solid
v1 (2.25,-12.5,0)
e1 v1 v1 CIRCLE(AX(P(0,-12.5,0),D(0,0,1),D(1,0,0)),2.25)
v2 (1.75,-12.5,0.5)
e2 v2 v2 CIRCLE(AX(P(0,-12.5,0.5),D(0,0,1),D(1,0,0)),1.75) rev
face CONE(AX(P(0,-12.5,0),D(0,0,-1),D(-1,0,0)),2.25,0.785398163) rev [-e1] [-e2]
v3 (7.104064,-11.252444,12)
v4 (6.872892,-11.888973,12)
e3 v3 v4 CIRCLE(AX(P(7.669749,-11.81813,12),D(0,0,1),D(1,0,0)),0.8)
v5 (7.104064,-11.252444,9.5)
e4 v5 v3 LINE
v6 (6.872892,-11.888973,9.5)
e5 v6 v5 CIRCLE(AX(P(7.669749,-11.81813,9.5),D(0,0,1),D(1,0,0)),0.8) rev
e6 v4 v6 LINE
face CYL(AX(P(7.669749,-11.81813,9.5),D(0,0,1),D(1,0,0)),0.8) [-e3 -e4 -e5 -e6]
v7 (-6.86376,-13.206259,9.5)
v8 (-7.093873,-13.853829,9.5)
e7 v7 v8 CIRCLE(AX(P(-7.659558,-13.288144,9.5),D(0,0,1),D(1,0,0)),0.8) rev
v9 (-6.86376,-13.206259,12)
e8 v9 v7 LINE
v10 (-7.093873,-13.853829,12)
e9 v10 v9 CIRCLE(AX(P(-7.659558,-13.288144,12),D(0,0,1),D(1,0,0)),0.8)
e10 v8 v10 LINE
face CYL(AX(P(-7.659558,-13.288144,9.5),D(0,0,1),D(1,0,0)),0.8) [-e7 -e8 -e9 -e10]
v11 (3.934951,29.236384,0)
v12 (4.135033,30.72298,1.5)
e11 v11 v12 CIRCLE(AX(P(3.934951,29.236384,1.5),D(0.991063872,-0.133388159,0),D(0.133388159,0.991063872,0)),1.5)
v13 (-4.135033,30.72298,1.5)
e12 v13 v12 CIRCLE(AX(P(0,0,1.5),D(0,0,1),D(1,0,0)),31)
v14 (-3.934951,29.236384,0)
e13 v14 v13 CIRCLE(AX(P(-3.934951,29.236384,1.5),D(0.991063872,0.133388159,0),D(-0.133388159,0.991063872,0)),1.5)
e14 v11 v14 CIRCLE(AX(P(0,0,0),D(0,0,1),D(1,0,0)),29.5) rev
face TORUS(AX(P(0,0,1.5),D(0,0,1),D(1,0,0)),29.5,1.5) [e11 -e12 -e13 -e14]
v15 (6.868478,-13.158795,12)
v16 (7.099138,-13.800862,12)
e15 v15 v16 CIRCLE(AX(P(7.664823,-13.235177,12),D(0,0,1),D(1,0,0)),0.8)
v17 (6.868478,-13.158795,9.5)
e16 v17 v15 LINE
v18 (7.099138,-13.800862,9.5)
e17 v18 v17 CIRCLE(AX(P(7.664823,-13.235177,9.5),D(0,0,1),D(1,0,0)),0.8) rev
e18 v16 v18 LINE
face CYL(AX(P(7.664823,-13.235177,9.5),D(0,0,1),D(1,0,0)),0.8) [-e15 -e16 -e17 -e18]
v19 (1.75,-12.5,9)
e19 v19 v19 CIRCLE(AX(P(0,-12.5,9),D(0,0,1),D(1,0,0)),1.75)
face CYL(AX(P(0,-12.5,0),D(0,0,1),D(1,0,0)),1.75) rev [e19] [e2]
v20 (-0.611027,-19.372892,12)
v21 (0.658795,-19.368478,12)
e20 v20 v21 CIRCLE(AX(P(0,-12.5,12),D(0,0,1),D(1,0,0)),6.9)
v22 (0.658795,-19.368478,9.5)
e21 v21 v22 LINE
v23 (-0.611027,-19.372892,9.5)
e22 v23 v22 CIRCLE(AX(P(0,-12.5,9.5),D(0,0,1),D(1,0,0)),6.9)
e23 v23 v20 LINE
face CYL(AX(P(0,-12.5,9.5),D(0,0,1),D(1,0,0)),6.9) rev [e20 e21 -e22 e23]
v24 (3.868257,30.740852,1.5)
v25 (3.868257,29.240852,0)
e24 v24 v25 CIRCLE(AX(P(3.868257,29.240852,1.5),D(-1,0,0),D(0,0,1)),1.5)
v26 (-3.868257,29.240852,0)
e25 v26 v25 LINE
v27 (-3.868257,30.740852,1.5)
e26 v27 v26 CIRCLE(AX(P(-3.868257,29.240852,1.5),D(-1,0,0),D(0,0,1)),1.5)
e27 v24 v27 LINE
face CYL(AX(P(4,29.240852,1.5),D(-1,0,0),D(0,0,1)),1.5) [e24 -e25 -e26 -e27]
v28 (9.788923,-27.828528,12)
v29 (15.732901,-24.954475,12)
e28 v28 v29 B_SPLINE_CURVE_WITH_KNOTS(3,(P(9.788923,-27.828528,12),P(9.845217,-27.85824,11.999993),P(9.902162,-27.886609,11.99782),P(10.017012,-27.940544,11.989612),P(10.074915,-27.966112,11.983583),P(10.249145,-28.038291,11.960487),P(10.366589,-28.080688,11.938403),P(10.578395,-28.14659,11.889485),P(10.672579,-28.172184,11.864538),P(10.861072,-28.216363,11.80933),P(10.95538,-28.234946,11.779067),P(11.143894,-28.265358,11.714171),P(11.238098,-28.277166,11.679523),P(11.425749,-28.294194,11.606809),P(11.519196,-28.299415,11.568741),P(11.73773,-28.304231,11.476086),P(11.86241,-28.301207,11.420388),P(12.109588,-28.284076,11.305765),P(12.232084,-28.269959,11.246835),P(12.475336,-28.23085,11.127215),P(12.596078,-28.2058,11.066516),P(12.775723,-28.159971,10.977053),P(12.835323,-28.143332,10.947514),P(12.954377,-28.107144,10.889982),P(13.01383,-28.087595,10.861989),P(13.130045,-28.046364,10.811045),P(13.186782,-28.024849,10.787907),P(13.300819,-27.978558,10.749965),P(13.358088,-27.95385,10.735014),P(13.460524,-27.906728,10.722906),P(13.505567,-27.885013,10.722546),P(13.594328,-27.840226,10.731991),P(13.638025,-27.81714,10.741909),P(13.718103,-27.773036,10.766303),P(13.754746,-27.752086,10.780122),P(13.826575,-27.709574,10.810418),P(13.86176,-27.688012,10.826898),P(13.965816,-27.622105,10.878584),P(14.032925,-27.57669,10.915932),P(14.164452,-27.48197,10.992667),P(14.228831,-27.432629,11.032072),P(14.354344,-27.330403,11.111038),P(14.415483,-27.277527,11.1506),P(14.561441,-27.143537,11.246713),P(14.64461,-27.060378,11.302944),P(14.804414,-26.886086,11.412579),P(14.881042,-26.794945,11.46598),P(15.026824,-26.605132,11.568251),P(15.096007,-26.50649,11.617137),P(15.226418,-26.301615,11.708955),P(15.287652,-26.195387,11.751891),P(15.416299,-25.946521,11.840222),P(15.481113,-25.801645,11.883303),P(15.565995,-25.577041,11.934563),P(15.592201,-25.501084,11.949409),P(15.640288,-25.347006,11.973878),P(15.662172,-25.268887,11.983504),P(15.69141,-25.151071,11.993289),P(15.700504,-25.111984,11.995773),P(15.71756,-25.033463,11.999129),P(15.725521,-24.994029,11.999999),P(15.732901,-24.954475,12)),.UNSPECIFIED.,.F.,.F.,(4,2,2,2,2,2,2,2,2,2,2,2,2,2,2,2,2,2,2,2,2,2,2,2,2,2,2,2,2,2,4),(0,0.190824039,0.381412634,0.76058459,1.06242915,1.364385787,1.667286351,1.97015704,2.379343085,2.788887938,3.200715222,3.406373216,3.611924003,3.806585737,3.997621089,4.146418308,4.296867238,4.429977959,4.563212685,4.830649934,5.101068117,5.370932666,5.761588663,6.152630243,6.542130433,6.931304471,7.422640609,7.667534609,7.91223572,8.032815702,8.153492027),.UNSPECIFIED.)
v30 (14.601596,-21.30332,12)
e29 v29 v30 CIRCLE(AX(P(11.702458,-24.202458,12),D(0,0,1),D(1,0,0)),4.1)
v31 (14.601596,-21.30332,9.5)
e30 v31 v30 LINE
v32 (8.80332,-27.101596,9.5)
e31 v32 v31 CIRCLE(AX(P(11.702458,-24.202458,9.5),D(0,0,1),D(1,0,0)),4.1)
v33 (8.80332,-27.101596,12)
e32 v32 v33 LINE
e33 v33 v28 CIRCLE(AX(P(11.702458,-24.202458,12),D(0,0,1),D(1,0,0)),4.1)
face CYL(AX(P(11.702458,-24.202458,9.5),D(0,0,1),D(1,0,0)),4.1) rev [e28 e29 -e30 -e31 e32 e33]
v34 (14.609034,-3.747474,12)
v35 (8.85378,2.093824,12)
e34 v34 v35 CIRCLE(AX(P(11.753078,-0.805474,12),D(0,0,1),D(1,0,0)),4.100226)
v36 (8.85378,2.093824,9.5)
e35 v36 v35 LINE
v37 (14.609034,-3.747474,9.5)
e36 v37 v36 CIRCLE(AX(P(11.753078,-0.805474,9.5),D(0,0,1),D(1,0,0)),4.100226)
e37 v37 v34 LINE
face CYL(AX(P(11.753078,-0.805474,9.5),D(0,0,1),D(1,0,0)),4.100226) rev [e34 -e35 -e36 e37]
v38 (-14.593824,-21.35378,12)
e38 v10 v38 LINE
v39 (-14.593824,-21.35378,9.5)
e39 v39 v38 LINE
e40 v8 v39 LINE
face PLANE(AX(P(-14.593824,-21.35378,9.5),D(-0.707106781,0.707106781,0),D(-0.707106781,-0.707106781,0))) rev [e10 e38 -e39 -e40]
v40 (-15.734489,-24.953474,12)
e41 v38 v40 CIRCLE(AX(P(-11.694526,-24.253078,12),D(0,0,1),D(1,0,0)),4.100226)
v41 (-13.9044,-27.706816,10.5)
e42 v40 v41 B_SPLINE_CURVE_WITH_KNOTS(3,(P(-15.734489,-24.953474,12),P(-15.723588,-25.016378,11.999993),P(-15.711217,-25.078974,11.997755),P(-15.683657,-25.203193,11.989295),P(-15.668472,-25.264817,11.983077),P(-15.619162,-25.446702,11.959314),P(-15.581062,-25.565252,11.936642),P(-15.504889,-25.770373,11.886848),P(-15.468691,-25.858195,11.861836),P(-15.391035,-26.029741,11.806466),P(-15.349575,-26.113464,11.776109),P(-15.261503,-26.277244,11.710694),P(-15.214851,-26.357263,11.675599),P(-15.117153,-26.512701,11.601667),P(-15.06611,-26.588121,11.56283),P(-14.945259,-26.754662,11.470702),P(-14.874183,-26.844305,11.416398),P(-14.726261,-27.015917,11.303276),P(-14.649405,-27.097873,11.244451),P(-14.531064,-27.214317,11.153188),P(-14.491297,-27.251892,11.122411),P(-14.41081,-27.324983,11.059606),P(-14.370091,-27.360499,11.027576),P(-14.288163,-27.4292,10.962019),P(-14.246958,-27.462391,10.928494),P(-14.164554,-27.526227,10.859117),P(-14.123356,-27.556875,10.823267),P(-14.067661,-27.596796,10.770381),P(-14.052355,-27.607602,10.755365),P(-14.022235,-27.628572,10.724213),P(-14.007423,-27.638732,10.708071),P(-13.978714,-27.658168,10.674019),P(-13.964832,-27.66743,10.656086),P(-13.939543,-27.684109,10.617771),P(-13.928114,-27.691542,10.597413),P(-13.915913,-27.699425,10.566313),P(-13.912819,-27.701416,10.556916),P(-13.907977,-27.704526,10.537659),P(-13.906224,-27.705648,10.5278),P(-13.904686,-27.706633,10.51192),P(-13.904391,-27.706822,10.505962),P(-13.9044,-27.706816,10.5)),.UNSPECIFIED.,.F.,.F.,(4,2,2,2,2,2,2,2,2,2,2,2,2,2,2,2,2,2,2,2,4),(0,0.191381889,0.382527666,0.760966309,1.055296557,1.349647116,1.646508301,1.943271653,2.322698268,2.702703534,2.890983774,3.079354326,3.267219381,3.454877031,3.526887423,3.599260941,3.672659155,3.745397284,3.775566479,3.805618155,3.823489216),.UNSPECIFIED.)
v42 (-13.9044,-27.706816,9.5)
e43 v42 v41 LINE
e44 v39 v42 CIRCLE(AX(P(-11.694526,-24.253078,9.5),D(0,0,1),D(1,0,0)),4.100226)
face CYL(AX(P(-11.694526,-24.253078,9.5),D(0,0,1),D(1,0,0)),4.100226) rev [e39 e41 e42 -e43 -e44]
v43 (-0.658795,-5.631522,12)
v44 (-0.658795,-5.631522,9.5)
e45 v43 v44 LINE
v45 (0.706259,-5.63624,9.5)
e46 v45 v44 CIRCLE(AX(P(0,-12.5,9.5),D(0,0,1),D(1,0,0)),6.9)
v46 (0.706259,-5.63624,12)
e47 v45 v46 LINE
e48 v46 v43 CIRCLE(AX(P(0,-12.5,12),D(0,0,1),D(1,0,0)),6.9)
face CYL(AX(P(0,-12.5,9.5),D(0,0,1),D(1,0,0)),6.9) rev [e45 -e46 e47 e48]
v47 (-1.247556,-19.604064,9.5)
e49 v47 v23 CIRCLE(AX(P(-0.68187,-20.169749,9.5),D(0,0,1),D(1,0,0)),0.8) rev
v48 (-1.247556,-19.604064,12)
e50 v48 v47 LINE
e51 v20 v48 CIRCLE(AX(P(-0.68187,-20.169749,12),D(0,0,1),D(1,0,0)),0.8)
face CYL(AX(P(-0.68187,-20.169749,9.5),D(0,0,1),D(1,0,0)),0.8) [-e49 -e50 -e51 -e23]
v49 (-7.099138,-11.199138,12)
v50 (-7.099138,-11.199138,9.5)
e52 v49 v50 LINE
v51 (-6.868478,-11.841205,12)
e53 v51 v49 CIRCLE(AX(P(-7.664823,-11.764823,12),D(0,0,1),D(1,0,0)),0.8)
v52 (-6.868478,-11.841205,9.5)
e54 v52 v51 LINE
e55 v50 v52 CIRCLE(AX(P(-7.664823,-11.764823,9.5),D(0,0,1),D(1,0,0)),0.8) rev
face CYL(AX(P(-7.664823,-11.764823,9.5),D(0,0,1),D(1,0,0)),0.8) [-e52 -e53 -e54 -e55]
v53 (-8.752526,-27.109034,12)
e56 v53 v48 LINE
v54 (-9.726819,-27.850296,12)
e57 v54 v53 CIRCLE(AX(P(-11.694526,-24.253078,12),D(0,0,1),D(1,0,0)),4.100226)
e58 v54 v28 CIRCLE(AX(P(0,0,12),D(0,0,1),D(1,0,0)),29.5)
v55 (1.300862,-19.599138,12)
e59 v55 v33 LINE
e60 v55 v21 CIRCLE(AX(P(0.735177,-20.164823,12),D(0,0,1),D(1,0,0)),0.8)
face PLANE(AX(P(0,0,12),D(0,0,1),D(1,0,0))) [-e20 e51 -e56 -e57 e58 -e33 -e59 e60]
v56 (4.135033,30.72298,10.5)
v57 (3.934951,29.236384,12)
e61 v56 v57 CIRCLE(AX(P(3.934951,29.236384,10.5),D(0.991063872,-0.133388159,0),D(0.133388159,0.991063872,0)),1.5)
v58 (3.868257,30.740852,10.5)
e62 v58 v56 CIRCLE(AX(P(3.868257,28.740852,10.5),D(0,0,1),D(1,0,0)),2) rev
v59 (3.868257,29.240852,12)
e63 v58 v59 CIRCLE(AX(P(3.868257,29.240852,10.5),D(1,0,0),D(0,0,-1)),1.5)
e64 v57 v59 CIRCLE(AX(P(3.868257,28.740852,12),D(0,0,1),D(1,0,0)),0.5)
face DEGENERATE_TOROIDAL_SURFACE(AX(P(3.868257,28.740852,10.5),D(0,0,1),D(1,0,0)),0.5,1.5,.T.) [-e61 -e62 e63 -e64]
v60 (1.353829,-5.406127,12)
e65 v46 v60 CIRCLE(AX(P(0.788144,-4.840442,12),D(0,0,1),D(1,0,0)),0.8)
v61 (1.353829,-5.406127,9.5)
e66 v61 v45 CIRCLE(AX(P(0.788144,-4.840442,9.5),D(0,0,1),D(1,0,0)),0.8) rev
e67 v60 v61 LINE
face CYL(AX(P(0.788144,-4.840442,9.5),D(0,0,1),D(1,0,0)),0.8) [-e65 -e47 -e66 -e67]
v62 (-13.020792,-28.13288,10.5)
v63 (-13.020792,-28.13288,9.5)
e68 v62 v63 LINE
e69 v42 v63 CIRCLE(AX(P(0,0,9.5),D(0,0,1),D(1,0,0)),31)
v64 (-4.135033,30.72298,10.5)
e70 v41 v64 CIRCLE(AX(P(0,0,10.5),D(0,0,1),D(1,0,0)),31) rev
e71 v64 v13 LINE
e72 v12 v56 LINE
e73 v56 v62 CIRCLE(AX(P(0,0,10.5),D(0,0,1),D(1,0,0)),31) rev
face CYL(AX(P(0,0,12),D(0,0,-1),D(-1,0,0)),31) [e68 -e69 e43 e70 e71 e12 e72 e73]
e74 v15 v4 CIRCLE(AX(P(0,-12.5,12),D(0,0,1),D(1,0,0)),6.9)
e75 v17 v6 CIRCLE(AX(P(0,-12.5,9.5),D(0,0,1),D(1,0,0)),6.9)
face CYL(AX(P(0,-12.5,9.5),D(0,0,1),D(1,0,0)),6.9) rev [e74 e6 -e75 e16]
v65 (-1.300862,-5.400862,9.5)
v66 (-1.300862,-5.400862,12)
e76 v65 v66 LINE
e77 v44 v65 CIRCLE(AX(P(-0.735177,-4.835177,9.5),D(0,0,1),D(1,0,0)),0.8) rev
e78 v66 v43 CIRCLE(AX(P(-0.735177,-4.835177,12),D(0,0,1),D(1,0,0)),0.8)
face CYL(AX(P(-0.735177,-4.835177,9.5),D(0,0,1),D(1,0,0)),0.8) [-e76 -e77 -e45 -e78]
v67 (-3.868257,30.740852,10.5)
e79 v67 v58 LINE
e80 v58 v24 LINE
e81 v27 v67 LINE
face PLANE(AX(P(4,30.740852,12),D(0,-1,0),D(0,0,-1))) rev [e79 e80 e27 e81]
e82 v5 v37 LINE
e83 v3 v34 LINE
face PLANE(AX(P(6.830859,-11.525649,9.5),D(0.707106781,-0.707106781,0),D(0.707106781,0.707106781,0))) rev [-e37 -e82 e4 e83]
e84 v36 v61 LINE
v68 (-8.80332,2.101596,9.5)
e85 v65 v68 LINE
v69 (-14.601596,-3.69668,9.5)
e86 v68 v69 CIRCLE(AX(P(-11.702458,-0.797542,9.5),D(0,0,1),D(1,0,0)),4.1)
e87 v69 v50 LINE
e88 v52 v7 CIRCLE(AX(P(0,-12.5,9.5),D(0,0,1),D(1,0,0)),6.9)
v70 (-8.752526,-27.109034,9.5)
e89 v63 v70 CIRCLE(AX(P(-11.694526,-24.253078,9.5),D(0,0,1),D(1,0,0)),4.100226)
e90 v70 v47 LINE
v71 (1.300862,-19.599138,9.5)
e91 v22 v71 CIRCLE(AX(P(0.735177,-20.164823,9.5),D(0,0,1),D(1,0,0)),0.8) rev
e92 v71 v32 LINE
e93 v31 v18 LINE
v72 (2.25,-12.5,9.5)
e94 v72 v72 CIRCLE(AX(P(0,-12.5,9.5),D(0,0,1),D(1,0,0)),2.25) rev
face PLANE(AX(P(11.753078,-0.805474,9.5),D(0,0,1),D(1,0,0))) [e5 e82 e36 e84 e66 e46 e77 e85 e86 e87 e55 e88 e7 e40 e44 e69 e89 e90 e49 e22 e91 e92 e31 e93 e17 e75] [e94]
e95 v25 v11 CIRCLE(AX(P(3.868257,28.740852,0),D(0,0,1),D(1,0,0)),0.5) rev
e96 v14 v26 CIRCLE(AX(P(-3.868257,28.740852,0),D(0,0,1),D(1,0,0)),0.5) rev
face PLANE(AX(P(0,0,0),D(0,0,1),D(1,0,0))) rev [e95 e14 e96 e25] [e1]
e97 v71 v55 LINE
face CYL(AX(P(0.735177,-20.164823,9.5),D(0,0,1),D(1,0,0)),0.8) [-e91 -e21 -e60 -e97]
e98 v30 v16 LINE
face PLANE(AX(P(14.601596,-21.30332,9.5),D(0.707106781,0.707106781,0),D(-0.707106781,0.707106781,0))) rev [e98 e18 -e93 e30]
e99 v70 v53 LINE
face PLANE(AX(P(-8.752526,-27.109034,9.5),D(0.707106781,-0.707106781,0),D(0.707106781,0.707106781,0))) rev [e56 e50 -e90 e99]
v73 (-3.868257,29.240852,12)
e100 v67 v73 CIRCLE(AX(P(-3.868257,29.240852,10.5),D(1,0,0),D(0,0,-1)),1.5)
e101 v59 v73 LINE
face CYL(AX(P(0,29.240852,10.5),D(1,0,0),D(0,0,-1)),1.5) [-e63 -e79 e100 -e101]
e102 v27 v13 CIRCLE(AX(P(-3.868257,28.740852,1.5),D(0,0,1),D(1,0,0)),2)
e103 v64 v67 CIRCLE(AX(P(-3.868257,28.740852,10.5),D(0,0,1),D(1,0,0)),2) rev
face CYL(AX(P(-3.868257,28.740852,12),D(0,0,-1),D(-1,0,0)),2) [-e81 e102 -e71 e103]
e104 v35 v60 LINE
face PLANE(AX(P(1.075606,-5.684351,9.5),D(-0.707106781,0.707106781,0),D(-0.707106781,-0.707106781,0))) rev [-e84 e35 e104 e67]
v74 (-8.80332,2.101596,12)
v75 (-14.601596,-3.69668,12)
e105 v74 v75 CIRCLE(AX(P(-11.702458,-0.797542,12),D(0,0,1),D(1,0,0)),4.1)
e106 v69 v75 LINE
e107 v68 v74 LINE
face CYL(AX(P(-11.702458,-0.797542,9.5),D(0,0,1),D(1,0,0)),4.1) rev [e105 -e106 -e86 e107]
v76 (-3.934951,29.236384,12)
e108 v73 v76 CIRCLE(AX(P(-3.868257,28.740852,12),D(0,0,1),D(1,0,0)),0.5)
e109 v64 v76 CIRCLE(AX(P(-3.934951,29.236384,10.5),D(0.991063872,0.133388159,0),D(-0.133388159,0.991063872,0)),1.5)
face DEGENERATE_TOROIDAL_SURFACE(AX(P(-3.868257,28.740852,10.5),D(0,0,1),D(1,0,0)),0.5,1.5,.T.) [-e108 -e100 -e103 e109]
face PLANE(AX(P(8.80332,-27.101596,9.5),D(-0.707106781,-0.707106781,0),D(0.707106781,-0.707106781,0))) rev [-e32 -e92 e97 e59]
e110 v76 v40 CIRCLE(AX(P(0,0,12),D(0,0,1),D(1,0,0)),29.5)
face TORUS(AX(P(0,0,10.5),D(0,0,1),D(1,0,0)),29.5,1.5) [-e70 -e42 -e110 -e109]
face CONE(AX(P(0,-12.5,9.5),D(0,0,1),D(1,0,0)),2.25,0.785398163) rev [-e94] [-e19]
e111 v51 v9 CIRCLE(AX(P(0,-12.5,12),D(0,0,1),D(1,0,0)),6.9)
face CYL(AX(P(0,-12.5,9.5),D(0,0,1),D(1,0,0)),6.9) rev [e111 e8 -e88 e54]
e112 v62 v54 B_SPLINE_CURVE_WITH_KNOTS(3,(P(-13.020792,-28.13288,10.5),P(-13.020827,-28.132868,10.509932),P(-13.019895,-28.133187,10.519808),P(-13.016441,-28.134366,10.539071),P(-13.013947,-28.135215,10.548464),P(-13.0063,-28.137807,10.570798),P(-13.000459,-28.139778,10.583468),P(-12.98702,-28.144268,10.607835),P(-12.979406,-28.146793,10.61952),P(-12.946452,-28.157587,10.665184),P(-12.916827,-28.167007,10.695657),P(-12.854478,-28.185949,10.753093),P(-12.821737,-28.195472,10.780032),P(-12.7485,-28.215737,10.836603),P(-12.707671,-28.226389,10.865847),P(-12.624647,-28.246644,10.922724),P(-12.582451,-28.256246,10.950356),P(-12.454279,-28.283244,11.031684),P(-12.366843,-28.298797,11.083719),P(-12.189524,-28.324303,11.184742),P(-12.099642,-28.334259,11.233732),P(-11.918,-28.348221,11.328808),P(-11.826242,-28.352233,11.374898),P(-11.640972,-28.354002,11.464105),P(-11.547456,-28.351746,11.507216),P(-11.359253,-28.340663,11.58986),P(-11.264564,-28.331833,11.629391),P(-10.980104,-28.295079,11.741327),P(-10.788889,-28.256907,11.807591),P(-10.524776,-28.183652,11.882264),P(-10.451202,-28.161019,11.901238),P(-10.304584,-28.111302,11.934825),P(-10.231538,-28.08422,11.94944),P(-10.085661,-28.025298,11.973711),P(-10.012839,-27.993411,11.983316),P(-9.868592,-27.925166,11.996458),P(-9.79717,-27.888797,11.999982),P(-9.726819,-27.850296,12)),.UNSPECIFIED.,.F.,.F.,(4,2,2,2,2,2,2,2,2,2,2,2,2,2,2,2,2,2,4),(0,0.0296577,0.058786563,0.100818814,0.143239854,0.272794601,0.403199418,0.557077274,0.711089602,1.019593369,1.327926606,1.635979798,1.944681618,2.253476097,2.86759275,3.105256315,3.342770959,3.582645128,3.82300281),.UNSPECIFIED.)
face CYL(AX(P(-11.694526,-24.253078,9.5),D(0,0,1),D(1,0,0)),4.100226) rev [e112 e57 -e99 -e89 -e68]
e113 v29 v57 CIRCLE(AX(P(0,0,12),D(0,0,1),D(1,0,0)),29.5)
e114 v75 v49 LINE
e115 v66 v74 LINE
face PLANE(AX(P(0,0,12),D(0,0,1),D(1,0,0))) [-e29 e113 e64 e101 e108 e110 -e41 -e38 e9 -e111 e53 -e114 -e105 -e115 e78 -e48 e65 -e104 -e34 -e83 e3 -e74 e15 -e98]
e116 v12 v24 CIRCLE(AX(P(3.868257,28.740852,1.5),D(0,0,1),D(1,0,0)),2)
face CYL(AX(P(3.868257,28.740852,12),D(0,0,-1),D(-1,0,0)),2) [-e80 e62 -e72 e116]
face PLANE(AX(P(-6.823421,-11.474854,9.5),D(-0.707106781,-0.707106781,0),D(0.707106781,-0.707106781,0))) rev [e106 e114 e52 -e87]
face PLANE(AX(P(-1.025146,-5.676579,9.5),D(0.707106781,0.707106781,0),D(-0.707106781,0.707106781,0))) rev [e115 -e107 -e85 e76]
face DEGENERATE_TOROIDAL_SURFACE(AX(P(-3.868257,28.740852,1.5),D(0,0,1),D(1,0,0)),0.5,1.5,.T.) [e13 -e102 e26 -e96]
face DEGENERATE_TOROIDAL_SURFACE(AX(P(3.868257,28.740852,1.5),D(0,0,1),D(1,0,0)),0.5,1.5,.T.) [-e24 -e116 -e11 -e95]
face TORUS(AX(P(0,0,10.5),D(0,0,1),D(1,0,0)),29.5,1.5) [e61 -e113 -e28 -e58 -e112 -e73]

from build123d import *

# Parameters (mm, degrees)
EXTRUDE_1_DEPTH     = 12
SKETCH_2_R          = 1.75
CUT_EXTRUDE_1_DEPTH = 46.453272709
CUT_EXTRUDE_2_DEPTH = 2.5
FILLET_2_R          = 2
FILLET_3_R          = 1.5
FILLET_5_R          = 0.8
CHAMFER_2_SIZE      = 0.5


with BuildPart() as part:
    # 草图1 → 凸台-拉伸1 (new body)
    with BuildSketch(Plane.XY):
        with BuildLine():
            Line((4, 30.740852298), (-4, 30.740852298))
            ThreePointArc((-4, 30.740852298), (0, -31), (4, 30.740852298))
        make_face()
    extrude(amount=EXTRUDE_1_DEPTH)

    # 草图2 → 切除-拉伸1 (cut, through all)
    with BuildSketch(Plane.XY.offset(12)):
        with Locations((0, -12.5)):
            Circle(SKETCH_2_R)
    extrude(amount=-CUT_EXTRUDE_1_DEPTH, mode=Mode.SUBTRACT)

    # 草图4 → 切除-拉伸2 (cut)
    with BuildSketch(Plane.XY.offset(12)):
        with BuildLine():
            Line((14.60159577, -21.303320164), (6.823421177, -13.525145571))
            ThreePointArc((6.823421177, -13.525145571), (6.899952258, -12.525667942), (6.83085934, -11.525648589))
            Line((6.83085934, -11.525648589), (14.609033933, -3.747473996))
            ThreePointArc((14.609033933, -3.747473996), (14.67380701, 2.072232238), (8.853780377, 2.09382366))
            Line((8.853780377, 2.09382366), (1.075605784, -5.684350934))
            ThreePointArc((1.075605784, -5.684350934), (0.025527626, -5.600047222), (-1.025145571, -5.676578823))
            Line((-1.025145571, -5.676578823), (-8.803320164, 2.10159577))
            ThreePointArc((-8.803320164, 2.10159577), (-14.60159577, 2.10159577), (-14.60159577, -3.696679836))
            Line((-14.60159577, -3.696679836), (-6.823421177, -11.474854429))
            ThreePointArc((-6.823421177, -11.474854429), (-6.899952778, -12.525527626), (-6.815649066, -13.575605784))
            Line((-6.815649066, -13.575605784), (-14.59382366, -21.353780377))
            ThreePointArc((-14.59382366, -21.353780377), (-14.572232238, -27.17380701), (-8.752526004, -27.109033933))
            Line((-8.752526004, -27.109033933), (-0.974351411, -19.33085934))
            ThreePointArc((-0.974351411, -19.33085934), (0.025667942, -19.399952258), (1.025145571, -19.323421177))
            Line((1.025145571, -19.323421177), (8.803320164, -27.10159577))
            ThreePointArc((8.803320164, -27.10159577), (14.60159577, -27.10159577), (14.60159577, -21.303320164))
        make_face()
    extrude(amount=-CUT_EXTRUDE_2_DEPTH, mode=Mode.SUBTRACT)

    # 圆角2
    fillet_2_edges = [part.edges().sort_by_distance(p)[0] for p in [
        (-4, 30.740852298, 6),
        (4, 30.740852298, 6),
    ]]
    fillet(fillet_2_edges, radius=FILLET_2_R)

    # 圆角3
    # the kernel refuses this fillet: 1.5 mm, written as the material it takes off along each edge
    with BuildSketch(Plane(origin=(0, 0, 12), x_dir=(-0.5266668059049125, -0.8500718061187049, 0), z_dir=(-0.8500718061187049, 0.5266668059049125, 0))) as fillet_3_piece_1:
        with BuildLine():
            CenterArc((31 - FILLET_3_R, -FILLET_3_R), FILLET_3_R, 0, 90)
            Line((31, -FILLET_3_R), (31, 0))
            Line((31, 0), (31 - FILLET_3_R, 0))
        make_face()
    revolve(axis=Axis((0, 0, 12), (0, 0, 1)), revolution_arc=204.115094482, mode=Mode.SUBTRACT)
    with BuildSketch(Plane(origin=(3.868256609, 30.740852298, 0), x_dir=(0, 0, 1), z_dir=(-1, 0, 0))) as fillet_3_piece_2:
        with BuildLine():
            CenterArc((FILLET_3_R, -FILLET_3_R), FILLET_3_R, 90, 90)
            Line((0, -FILLET_3_R), (0, 0))
            Line((0, 0), (FILLET_3_R, 0))
        make_face()
    extrude(amount=7.736513218, mode=Mode.SUBTRACT)
    with BuildSketch(Plane(origin=(3.868256609, 30.740852298, 12), x_dir=(0, 0, -1), z_dir=(-1, 0, 0))) as fillet_3_piece_3:
        with BuildLine():
            CenterArc((FILLET_3_R, FILLET_3_R), FILLET_3_R, 180, 90)
            Line((0, FILLET_3_R), (0, 0))
            Line((0, 0), (FILLET_3_R, 0))
        make_face()
    extrude(amount=7.736513218, mode=Mode.SUBTRACT)
    with BuildSketch(Plane(origin=(0, 0, 0), x_dir=(-0.1333881589240954, 0.991063872340648, 0), z_dir=(0.991063872340648, 0.1333881589240954, 0))) as fillet_3_piece_4:
        with BuildLine():
            CenterArc((31 - FILLET_3_R, FILLET_3_R), FILLET_3_R, 270, 90)
            Line((31, FILLET_3_R), (31, 0))
            Line((31, 0), (31 - FILLET_3_R, 0))
        make_face()
    revolve(axis=Axis((0, 0, 0), (0, 0, 1)), revolution_arc=344.669149504, mode=Mode.SUBTRACT)
    with BuildSketch(Plane(origin=(-3.868256609, 28.740852298, 0), x_dir=(0, 1, 0), z_dir=(1, 0, 0))) as fillet_3_piece_5:
        with BuildLine():
            CenterArc((2 - FILLET_3_R, FILLET_3_R), FILLET_3_R, 270, 90)
            Line((2, FILLET_3_R), (2, 0))
            Line((2, 0), (2 - FILLET_3_R, 0))
        make_face()
    revolve(axis=Axis((-3.868256609, 28.740852298, 0), (0, 0, 1)), revolution_arc=7.665425248, mode=Mode.SUBTRACT)
    with BuildSketch(Plane(origin=(3.868256609, 28.740852298, 0), x_dir=(0, 1, 0), z_dir=(-1, 0, 0))) as fillet_3_piece_6:
        with BuildLine():
            CenterArc((2 - FILLET_3_R, -FILLET_3_R), FILLET_3_R, 0, 90)
            Line((2, -FILLET_3_R), (2, 0))
            Line((2, 0), (2 - FILLET_3_R, 0))
        make_face()
    revolve(axis=Axis((3.868256609, 28.740852298, 0), (0, 0, -1)), revolution_arc=7.665425248, mode=Mode.SUBTRACT)
    with BuildSketch(Plane(origin=(0, 0, 12), x_dir=(-0.1333881589240954, 0.991063872340648, 0), z_dir=(0.991063872340648, 0.1333881589240954, 0))) as fillet_3_piece_7:
        with BuildLine():
            CenterArc((31 - FILLET_3_R, -FILLET_3_R), FILLET_3_R, 0, 90)
            Line((31, -FILLET_3_R), (31, 0))
            Line((31, 0), (31 - FILLET_3_R, 0))
        make_face()
    revolve(axis=Axis((0, 0, 12), (0, 0, 1)), revolution_arc=152.623466515, mode=Mode.SUBTRACT)
    with BuildSketch(Plane(origin=(-3.868256609, 28.740852298, 12), x_dir=(0, 1, 0), z_dir=(1, 0, 0))) as fillet_3_piece_8:
        with BuildLine():
            CenterArc((2 - FILLET_3_R, -FILLET_3_R), FILLET_3_R, 0, 90)
            Line((2 - FILLET_3_R, 0), (2, 0))
            Line((2, 0), (2, -FILLET_3_R))
        make_face()
    revolve(axis=Axis((-3.868256609, 28.740852298, 12), (0, 0, 1)), revolution_arc=7.665425248, mode=Mode.SUBTRACT)
    with BuildSketch(Plane(origin=(3.868256609, 28.740852298, 12), x_dir=(0, 1, 0), z_dir=(-1, 0, 0))) as fillet_3_piece_9:
        with BuildLine():
            CenterArc((2 - FILLET_3_R, FILLET_3_R), FILLET_3_R, 270, 90)
            Line((2 - FILLET_3_R, 0), (2, 0))
            Line((2, 0), (2, FILLET_3_R))
        make_face()
    revolve(axis=Axis((3.868256609, 28.740852298, 12), (0, 0, -1)), revolution_arc=7.665425248, mode=Mode.SUBTRACT)

    # 圆角5
    fillet_5_edges = [part.edges().sort_by_distance(p)[0] for p in [
        (6.83085934, -11.525648589, 10.75),
        (6.823421177, -13.525145571, 10.75),
        (1.025145571, -19.323421177, 10.75),
        (-0.974351411, -19.33085934, 10.75),
        (-6.815649066, -13.575605784, 10.75),
        (-6.823421177, -11.474854429, 10.75),
        (-1.025145571, -5.676578823, 10.75),
        (1.075605784, -5.684350934, 10.75),
    ]]
    fillet(fillet_5_edges, radius=FILLET_5_R)

    # 倒角2
    chamfer_2_edges = [part.edges().sort_by_distance(p)[0] for p in [
        (-1.75, -12.5, 0),
        (-1.75, -12.5, 9.5),
    ]]
    chamfer(chamfer_2_edges, length=CHAMFER_2_SIZE)


solid = part.part
